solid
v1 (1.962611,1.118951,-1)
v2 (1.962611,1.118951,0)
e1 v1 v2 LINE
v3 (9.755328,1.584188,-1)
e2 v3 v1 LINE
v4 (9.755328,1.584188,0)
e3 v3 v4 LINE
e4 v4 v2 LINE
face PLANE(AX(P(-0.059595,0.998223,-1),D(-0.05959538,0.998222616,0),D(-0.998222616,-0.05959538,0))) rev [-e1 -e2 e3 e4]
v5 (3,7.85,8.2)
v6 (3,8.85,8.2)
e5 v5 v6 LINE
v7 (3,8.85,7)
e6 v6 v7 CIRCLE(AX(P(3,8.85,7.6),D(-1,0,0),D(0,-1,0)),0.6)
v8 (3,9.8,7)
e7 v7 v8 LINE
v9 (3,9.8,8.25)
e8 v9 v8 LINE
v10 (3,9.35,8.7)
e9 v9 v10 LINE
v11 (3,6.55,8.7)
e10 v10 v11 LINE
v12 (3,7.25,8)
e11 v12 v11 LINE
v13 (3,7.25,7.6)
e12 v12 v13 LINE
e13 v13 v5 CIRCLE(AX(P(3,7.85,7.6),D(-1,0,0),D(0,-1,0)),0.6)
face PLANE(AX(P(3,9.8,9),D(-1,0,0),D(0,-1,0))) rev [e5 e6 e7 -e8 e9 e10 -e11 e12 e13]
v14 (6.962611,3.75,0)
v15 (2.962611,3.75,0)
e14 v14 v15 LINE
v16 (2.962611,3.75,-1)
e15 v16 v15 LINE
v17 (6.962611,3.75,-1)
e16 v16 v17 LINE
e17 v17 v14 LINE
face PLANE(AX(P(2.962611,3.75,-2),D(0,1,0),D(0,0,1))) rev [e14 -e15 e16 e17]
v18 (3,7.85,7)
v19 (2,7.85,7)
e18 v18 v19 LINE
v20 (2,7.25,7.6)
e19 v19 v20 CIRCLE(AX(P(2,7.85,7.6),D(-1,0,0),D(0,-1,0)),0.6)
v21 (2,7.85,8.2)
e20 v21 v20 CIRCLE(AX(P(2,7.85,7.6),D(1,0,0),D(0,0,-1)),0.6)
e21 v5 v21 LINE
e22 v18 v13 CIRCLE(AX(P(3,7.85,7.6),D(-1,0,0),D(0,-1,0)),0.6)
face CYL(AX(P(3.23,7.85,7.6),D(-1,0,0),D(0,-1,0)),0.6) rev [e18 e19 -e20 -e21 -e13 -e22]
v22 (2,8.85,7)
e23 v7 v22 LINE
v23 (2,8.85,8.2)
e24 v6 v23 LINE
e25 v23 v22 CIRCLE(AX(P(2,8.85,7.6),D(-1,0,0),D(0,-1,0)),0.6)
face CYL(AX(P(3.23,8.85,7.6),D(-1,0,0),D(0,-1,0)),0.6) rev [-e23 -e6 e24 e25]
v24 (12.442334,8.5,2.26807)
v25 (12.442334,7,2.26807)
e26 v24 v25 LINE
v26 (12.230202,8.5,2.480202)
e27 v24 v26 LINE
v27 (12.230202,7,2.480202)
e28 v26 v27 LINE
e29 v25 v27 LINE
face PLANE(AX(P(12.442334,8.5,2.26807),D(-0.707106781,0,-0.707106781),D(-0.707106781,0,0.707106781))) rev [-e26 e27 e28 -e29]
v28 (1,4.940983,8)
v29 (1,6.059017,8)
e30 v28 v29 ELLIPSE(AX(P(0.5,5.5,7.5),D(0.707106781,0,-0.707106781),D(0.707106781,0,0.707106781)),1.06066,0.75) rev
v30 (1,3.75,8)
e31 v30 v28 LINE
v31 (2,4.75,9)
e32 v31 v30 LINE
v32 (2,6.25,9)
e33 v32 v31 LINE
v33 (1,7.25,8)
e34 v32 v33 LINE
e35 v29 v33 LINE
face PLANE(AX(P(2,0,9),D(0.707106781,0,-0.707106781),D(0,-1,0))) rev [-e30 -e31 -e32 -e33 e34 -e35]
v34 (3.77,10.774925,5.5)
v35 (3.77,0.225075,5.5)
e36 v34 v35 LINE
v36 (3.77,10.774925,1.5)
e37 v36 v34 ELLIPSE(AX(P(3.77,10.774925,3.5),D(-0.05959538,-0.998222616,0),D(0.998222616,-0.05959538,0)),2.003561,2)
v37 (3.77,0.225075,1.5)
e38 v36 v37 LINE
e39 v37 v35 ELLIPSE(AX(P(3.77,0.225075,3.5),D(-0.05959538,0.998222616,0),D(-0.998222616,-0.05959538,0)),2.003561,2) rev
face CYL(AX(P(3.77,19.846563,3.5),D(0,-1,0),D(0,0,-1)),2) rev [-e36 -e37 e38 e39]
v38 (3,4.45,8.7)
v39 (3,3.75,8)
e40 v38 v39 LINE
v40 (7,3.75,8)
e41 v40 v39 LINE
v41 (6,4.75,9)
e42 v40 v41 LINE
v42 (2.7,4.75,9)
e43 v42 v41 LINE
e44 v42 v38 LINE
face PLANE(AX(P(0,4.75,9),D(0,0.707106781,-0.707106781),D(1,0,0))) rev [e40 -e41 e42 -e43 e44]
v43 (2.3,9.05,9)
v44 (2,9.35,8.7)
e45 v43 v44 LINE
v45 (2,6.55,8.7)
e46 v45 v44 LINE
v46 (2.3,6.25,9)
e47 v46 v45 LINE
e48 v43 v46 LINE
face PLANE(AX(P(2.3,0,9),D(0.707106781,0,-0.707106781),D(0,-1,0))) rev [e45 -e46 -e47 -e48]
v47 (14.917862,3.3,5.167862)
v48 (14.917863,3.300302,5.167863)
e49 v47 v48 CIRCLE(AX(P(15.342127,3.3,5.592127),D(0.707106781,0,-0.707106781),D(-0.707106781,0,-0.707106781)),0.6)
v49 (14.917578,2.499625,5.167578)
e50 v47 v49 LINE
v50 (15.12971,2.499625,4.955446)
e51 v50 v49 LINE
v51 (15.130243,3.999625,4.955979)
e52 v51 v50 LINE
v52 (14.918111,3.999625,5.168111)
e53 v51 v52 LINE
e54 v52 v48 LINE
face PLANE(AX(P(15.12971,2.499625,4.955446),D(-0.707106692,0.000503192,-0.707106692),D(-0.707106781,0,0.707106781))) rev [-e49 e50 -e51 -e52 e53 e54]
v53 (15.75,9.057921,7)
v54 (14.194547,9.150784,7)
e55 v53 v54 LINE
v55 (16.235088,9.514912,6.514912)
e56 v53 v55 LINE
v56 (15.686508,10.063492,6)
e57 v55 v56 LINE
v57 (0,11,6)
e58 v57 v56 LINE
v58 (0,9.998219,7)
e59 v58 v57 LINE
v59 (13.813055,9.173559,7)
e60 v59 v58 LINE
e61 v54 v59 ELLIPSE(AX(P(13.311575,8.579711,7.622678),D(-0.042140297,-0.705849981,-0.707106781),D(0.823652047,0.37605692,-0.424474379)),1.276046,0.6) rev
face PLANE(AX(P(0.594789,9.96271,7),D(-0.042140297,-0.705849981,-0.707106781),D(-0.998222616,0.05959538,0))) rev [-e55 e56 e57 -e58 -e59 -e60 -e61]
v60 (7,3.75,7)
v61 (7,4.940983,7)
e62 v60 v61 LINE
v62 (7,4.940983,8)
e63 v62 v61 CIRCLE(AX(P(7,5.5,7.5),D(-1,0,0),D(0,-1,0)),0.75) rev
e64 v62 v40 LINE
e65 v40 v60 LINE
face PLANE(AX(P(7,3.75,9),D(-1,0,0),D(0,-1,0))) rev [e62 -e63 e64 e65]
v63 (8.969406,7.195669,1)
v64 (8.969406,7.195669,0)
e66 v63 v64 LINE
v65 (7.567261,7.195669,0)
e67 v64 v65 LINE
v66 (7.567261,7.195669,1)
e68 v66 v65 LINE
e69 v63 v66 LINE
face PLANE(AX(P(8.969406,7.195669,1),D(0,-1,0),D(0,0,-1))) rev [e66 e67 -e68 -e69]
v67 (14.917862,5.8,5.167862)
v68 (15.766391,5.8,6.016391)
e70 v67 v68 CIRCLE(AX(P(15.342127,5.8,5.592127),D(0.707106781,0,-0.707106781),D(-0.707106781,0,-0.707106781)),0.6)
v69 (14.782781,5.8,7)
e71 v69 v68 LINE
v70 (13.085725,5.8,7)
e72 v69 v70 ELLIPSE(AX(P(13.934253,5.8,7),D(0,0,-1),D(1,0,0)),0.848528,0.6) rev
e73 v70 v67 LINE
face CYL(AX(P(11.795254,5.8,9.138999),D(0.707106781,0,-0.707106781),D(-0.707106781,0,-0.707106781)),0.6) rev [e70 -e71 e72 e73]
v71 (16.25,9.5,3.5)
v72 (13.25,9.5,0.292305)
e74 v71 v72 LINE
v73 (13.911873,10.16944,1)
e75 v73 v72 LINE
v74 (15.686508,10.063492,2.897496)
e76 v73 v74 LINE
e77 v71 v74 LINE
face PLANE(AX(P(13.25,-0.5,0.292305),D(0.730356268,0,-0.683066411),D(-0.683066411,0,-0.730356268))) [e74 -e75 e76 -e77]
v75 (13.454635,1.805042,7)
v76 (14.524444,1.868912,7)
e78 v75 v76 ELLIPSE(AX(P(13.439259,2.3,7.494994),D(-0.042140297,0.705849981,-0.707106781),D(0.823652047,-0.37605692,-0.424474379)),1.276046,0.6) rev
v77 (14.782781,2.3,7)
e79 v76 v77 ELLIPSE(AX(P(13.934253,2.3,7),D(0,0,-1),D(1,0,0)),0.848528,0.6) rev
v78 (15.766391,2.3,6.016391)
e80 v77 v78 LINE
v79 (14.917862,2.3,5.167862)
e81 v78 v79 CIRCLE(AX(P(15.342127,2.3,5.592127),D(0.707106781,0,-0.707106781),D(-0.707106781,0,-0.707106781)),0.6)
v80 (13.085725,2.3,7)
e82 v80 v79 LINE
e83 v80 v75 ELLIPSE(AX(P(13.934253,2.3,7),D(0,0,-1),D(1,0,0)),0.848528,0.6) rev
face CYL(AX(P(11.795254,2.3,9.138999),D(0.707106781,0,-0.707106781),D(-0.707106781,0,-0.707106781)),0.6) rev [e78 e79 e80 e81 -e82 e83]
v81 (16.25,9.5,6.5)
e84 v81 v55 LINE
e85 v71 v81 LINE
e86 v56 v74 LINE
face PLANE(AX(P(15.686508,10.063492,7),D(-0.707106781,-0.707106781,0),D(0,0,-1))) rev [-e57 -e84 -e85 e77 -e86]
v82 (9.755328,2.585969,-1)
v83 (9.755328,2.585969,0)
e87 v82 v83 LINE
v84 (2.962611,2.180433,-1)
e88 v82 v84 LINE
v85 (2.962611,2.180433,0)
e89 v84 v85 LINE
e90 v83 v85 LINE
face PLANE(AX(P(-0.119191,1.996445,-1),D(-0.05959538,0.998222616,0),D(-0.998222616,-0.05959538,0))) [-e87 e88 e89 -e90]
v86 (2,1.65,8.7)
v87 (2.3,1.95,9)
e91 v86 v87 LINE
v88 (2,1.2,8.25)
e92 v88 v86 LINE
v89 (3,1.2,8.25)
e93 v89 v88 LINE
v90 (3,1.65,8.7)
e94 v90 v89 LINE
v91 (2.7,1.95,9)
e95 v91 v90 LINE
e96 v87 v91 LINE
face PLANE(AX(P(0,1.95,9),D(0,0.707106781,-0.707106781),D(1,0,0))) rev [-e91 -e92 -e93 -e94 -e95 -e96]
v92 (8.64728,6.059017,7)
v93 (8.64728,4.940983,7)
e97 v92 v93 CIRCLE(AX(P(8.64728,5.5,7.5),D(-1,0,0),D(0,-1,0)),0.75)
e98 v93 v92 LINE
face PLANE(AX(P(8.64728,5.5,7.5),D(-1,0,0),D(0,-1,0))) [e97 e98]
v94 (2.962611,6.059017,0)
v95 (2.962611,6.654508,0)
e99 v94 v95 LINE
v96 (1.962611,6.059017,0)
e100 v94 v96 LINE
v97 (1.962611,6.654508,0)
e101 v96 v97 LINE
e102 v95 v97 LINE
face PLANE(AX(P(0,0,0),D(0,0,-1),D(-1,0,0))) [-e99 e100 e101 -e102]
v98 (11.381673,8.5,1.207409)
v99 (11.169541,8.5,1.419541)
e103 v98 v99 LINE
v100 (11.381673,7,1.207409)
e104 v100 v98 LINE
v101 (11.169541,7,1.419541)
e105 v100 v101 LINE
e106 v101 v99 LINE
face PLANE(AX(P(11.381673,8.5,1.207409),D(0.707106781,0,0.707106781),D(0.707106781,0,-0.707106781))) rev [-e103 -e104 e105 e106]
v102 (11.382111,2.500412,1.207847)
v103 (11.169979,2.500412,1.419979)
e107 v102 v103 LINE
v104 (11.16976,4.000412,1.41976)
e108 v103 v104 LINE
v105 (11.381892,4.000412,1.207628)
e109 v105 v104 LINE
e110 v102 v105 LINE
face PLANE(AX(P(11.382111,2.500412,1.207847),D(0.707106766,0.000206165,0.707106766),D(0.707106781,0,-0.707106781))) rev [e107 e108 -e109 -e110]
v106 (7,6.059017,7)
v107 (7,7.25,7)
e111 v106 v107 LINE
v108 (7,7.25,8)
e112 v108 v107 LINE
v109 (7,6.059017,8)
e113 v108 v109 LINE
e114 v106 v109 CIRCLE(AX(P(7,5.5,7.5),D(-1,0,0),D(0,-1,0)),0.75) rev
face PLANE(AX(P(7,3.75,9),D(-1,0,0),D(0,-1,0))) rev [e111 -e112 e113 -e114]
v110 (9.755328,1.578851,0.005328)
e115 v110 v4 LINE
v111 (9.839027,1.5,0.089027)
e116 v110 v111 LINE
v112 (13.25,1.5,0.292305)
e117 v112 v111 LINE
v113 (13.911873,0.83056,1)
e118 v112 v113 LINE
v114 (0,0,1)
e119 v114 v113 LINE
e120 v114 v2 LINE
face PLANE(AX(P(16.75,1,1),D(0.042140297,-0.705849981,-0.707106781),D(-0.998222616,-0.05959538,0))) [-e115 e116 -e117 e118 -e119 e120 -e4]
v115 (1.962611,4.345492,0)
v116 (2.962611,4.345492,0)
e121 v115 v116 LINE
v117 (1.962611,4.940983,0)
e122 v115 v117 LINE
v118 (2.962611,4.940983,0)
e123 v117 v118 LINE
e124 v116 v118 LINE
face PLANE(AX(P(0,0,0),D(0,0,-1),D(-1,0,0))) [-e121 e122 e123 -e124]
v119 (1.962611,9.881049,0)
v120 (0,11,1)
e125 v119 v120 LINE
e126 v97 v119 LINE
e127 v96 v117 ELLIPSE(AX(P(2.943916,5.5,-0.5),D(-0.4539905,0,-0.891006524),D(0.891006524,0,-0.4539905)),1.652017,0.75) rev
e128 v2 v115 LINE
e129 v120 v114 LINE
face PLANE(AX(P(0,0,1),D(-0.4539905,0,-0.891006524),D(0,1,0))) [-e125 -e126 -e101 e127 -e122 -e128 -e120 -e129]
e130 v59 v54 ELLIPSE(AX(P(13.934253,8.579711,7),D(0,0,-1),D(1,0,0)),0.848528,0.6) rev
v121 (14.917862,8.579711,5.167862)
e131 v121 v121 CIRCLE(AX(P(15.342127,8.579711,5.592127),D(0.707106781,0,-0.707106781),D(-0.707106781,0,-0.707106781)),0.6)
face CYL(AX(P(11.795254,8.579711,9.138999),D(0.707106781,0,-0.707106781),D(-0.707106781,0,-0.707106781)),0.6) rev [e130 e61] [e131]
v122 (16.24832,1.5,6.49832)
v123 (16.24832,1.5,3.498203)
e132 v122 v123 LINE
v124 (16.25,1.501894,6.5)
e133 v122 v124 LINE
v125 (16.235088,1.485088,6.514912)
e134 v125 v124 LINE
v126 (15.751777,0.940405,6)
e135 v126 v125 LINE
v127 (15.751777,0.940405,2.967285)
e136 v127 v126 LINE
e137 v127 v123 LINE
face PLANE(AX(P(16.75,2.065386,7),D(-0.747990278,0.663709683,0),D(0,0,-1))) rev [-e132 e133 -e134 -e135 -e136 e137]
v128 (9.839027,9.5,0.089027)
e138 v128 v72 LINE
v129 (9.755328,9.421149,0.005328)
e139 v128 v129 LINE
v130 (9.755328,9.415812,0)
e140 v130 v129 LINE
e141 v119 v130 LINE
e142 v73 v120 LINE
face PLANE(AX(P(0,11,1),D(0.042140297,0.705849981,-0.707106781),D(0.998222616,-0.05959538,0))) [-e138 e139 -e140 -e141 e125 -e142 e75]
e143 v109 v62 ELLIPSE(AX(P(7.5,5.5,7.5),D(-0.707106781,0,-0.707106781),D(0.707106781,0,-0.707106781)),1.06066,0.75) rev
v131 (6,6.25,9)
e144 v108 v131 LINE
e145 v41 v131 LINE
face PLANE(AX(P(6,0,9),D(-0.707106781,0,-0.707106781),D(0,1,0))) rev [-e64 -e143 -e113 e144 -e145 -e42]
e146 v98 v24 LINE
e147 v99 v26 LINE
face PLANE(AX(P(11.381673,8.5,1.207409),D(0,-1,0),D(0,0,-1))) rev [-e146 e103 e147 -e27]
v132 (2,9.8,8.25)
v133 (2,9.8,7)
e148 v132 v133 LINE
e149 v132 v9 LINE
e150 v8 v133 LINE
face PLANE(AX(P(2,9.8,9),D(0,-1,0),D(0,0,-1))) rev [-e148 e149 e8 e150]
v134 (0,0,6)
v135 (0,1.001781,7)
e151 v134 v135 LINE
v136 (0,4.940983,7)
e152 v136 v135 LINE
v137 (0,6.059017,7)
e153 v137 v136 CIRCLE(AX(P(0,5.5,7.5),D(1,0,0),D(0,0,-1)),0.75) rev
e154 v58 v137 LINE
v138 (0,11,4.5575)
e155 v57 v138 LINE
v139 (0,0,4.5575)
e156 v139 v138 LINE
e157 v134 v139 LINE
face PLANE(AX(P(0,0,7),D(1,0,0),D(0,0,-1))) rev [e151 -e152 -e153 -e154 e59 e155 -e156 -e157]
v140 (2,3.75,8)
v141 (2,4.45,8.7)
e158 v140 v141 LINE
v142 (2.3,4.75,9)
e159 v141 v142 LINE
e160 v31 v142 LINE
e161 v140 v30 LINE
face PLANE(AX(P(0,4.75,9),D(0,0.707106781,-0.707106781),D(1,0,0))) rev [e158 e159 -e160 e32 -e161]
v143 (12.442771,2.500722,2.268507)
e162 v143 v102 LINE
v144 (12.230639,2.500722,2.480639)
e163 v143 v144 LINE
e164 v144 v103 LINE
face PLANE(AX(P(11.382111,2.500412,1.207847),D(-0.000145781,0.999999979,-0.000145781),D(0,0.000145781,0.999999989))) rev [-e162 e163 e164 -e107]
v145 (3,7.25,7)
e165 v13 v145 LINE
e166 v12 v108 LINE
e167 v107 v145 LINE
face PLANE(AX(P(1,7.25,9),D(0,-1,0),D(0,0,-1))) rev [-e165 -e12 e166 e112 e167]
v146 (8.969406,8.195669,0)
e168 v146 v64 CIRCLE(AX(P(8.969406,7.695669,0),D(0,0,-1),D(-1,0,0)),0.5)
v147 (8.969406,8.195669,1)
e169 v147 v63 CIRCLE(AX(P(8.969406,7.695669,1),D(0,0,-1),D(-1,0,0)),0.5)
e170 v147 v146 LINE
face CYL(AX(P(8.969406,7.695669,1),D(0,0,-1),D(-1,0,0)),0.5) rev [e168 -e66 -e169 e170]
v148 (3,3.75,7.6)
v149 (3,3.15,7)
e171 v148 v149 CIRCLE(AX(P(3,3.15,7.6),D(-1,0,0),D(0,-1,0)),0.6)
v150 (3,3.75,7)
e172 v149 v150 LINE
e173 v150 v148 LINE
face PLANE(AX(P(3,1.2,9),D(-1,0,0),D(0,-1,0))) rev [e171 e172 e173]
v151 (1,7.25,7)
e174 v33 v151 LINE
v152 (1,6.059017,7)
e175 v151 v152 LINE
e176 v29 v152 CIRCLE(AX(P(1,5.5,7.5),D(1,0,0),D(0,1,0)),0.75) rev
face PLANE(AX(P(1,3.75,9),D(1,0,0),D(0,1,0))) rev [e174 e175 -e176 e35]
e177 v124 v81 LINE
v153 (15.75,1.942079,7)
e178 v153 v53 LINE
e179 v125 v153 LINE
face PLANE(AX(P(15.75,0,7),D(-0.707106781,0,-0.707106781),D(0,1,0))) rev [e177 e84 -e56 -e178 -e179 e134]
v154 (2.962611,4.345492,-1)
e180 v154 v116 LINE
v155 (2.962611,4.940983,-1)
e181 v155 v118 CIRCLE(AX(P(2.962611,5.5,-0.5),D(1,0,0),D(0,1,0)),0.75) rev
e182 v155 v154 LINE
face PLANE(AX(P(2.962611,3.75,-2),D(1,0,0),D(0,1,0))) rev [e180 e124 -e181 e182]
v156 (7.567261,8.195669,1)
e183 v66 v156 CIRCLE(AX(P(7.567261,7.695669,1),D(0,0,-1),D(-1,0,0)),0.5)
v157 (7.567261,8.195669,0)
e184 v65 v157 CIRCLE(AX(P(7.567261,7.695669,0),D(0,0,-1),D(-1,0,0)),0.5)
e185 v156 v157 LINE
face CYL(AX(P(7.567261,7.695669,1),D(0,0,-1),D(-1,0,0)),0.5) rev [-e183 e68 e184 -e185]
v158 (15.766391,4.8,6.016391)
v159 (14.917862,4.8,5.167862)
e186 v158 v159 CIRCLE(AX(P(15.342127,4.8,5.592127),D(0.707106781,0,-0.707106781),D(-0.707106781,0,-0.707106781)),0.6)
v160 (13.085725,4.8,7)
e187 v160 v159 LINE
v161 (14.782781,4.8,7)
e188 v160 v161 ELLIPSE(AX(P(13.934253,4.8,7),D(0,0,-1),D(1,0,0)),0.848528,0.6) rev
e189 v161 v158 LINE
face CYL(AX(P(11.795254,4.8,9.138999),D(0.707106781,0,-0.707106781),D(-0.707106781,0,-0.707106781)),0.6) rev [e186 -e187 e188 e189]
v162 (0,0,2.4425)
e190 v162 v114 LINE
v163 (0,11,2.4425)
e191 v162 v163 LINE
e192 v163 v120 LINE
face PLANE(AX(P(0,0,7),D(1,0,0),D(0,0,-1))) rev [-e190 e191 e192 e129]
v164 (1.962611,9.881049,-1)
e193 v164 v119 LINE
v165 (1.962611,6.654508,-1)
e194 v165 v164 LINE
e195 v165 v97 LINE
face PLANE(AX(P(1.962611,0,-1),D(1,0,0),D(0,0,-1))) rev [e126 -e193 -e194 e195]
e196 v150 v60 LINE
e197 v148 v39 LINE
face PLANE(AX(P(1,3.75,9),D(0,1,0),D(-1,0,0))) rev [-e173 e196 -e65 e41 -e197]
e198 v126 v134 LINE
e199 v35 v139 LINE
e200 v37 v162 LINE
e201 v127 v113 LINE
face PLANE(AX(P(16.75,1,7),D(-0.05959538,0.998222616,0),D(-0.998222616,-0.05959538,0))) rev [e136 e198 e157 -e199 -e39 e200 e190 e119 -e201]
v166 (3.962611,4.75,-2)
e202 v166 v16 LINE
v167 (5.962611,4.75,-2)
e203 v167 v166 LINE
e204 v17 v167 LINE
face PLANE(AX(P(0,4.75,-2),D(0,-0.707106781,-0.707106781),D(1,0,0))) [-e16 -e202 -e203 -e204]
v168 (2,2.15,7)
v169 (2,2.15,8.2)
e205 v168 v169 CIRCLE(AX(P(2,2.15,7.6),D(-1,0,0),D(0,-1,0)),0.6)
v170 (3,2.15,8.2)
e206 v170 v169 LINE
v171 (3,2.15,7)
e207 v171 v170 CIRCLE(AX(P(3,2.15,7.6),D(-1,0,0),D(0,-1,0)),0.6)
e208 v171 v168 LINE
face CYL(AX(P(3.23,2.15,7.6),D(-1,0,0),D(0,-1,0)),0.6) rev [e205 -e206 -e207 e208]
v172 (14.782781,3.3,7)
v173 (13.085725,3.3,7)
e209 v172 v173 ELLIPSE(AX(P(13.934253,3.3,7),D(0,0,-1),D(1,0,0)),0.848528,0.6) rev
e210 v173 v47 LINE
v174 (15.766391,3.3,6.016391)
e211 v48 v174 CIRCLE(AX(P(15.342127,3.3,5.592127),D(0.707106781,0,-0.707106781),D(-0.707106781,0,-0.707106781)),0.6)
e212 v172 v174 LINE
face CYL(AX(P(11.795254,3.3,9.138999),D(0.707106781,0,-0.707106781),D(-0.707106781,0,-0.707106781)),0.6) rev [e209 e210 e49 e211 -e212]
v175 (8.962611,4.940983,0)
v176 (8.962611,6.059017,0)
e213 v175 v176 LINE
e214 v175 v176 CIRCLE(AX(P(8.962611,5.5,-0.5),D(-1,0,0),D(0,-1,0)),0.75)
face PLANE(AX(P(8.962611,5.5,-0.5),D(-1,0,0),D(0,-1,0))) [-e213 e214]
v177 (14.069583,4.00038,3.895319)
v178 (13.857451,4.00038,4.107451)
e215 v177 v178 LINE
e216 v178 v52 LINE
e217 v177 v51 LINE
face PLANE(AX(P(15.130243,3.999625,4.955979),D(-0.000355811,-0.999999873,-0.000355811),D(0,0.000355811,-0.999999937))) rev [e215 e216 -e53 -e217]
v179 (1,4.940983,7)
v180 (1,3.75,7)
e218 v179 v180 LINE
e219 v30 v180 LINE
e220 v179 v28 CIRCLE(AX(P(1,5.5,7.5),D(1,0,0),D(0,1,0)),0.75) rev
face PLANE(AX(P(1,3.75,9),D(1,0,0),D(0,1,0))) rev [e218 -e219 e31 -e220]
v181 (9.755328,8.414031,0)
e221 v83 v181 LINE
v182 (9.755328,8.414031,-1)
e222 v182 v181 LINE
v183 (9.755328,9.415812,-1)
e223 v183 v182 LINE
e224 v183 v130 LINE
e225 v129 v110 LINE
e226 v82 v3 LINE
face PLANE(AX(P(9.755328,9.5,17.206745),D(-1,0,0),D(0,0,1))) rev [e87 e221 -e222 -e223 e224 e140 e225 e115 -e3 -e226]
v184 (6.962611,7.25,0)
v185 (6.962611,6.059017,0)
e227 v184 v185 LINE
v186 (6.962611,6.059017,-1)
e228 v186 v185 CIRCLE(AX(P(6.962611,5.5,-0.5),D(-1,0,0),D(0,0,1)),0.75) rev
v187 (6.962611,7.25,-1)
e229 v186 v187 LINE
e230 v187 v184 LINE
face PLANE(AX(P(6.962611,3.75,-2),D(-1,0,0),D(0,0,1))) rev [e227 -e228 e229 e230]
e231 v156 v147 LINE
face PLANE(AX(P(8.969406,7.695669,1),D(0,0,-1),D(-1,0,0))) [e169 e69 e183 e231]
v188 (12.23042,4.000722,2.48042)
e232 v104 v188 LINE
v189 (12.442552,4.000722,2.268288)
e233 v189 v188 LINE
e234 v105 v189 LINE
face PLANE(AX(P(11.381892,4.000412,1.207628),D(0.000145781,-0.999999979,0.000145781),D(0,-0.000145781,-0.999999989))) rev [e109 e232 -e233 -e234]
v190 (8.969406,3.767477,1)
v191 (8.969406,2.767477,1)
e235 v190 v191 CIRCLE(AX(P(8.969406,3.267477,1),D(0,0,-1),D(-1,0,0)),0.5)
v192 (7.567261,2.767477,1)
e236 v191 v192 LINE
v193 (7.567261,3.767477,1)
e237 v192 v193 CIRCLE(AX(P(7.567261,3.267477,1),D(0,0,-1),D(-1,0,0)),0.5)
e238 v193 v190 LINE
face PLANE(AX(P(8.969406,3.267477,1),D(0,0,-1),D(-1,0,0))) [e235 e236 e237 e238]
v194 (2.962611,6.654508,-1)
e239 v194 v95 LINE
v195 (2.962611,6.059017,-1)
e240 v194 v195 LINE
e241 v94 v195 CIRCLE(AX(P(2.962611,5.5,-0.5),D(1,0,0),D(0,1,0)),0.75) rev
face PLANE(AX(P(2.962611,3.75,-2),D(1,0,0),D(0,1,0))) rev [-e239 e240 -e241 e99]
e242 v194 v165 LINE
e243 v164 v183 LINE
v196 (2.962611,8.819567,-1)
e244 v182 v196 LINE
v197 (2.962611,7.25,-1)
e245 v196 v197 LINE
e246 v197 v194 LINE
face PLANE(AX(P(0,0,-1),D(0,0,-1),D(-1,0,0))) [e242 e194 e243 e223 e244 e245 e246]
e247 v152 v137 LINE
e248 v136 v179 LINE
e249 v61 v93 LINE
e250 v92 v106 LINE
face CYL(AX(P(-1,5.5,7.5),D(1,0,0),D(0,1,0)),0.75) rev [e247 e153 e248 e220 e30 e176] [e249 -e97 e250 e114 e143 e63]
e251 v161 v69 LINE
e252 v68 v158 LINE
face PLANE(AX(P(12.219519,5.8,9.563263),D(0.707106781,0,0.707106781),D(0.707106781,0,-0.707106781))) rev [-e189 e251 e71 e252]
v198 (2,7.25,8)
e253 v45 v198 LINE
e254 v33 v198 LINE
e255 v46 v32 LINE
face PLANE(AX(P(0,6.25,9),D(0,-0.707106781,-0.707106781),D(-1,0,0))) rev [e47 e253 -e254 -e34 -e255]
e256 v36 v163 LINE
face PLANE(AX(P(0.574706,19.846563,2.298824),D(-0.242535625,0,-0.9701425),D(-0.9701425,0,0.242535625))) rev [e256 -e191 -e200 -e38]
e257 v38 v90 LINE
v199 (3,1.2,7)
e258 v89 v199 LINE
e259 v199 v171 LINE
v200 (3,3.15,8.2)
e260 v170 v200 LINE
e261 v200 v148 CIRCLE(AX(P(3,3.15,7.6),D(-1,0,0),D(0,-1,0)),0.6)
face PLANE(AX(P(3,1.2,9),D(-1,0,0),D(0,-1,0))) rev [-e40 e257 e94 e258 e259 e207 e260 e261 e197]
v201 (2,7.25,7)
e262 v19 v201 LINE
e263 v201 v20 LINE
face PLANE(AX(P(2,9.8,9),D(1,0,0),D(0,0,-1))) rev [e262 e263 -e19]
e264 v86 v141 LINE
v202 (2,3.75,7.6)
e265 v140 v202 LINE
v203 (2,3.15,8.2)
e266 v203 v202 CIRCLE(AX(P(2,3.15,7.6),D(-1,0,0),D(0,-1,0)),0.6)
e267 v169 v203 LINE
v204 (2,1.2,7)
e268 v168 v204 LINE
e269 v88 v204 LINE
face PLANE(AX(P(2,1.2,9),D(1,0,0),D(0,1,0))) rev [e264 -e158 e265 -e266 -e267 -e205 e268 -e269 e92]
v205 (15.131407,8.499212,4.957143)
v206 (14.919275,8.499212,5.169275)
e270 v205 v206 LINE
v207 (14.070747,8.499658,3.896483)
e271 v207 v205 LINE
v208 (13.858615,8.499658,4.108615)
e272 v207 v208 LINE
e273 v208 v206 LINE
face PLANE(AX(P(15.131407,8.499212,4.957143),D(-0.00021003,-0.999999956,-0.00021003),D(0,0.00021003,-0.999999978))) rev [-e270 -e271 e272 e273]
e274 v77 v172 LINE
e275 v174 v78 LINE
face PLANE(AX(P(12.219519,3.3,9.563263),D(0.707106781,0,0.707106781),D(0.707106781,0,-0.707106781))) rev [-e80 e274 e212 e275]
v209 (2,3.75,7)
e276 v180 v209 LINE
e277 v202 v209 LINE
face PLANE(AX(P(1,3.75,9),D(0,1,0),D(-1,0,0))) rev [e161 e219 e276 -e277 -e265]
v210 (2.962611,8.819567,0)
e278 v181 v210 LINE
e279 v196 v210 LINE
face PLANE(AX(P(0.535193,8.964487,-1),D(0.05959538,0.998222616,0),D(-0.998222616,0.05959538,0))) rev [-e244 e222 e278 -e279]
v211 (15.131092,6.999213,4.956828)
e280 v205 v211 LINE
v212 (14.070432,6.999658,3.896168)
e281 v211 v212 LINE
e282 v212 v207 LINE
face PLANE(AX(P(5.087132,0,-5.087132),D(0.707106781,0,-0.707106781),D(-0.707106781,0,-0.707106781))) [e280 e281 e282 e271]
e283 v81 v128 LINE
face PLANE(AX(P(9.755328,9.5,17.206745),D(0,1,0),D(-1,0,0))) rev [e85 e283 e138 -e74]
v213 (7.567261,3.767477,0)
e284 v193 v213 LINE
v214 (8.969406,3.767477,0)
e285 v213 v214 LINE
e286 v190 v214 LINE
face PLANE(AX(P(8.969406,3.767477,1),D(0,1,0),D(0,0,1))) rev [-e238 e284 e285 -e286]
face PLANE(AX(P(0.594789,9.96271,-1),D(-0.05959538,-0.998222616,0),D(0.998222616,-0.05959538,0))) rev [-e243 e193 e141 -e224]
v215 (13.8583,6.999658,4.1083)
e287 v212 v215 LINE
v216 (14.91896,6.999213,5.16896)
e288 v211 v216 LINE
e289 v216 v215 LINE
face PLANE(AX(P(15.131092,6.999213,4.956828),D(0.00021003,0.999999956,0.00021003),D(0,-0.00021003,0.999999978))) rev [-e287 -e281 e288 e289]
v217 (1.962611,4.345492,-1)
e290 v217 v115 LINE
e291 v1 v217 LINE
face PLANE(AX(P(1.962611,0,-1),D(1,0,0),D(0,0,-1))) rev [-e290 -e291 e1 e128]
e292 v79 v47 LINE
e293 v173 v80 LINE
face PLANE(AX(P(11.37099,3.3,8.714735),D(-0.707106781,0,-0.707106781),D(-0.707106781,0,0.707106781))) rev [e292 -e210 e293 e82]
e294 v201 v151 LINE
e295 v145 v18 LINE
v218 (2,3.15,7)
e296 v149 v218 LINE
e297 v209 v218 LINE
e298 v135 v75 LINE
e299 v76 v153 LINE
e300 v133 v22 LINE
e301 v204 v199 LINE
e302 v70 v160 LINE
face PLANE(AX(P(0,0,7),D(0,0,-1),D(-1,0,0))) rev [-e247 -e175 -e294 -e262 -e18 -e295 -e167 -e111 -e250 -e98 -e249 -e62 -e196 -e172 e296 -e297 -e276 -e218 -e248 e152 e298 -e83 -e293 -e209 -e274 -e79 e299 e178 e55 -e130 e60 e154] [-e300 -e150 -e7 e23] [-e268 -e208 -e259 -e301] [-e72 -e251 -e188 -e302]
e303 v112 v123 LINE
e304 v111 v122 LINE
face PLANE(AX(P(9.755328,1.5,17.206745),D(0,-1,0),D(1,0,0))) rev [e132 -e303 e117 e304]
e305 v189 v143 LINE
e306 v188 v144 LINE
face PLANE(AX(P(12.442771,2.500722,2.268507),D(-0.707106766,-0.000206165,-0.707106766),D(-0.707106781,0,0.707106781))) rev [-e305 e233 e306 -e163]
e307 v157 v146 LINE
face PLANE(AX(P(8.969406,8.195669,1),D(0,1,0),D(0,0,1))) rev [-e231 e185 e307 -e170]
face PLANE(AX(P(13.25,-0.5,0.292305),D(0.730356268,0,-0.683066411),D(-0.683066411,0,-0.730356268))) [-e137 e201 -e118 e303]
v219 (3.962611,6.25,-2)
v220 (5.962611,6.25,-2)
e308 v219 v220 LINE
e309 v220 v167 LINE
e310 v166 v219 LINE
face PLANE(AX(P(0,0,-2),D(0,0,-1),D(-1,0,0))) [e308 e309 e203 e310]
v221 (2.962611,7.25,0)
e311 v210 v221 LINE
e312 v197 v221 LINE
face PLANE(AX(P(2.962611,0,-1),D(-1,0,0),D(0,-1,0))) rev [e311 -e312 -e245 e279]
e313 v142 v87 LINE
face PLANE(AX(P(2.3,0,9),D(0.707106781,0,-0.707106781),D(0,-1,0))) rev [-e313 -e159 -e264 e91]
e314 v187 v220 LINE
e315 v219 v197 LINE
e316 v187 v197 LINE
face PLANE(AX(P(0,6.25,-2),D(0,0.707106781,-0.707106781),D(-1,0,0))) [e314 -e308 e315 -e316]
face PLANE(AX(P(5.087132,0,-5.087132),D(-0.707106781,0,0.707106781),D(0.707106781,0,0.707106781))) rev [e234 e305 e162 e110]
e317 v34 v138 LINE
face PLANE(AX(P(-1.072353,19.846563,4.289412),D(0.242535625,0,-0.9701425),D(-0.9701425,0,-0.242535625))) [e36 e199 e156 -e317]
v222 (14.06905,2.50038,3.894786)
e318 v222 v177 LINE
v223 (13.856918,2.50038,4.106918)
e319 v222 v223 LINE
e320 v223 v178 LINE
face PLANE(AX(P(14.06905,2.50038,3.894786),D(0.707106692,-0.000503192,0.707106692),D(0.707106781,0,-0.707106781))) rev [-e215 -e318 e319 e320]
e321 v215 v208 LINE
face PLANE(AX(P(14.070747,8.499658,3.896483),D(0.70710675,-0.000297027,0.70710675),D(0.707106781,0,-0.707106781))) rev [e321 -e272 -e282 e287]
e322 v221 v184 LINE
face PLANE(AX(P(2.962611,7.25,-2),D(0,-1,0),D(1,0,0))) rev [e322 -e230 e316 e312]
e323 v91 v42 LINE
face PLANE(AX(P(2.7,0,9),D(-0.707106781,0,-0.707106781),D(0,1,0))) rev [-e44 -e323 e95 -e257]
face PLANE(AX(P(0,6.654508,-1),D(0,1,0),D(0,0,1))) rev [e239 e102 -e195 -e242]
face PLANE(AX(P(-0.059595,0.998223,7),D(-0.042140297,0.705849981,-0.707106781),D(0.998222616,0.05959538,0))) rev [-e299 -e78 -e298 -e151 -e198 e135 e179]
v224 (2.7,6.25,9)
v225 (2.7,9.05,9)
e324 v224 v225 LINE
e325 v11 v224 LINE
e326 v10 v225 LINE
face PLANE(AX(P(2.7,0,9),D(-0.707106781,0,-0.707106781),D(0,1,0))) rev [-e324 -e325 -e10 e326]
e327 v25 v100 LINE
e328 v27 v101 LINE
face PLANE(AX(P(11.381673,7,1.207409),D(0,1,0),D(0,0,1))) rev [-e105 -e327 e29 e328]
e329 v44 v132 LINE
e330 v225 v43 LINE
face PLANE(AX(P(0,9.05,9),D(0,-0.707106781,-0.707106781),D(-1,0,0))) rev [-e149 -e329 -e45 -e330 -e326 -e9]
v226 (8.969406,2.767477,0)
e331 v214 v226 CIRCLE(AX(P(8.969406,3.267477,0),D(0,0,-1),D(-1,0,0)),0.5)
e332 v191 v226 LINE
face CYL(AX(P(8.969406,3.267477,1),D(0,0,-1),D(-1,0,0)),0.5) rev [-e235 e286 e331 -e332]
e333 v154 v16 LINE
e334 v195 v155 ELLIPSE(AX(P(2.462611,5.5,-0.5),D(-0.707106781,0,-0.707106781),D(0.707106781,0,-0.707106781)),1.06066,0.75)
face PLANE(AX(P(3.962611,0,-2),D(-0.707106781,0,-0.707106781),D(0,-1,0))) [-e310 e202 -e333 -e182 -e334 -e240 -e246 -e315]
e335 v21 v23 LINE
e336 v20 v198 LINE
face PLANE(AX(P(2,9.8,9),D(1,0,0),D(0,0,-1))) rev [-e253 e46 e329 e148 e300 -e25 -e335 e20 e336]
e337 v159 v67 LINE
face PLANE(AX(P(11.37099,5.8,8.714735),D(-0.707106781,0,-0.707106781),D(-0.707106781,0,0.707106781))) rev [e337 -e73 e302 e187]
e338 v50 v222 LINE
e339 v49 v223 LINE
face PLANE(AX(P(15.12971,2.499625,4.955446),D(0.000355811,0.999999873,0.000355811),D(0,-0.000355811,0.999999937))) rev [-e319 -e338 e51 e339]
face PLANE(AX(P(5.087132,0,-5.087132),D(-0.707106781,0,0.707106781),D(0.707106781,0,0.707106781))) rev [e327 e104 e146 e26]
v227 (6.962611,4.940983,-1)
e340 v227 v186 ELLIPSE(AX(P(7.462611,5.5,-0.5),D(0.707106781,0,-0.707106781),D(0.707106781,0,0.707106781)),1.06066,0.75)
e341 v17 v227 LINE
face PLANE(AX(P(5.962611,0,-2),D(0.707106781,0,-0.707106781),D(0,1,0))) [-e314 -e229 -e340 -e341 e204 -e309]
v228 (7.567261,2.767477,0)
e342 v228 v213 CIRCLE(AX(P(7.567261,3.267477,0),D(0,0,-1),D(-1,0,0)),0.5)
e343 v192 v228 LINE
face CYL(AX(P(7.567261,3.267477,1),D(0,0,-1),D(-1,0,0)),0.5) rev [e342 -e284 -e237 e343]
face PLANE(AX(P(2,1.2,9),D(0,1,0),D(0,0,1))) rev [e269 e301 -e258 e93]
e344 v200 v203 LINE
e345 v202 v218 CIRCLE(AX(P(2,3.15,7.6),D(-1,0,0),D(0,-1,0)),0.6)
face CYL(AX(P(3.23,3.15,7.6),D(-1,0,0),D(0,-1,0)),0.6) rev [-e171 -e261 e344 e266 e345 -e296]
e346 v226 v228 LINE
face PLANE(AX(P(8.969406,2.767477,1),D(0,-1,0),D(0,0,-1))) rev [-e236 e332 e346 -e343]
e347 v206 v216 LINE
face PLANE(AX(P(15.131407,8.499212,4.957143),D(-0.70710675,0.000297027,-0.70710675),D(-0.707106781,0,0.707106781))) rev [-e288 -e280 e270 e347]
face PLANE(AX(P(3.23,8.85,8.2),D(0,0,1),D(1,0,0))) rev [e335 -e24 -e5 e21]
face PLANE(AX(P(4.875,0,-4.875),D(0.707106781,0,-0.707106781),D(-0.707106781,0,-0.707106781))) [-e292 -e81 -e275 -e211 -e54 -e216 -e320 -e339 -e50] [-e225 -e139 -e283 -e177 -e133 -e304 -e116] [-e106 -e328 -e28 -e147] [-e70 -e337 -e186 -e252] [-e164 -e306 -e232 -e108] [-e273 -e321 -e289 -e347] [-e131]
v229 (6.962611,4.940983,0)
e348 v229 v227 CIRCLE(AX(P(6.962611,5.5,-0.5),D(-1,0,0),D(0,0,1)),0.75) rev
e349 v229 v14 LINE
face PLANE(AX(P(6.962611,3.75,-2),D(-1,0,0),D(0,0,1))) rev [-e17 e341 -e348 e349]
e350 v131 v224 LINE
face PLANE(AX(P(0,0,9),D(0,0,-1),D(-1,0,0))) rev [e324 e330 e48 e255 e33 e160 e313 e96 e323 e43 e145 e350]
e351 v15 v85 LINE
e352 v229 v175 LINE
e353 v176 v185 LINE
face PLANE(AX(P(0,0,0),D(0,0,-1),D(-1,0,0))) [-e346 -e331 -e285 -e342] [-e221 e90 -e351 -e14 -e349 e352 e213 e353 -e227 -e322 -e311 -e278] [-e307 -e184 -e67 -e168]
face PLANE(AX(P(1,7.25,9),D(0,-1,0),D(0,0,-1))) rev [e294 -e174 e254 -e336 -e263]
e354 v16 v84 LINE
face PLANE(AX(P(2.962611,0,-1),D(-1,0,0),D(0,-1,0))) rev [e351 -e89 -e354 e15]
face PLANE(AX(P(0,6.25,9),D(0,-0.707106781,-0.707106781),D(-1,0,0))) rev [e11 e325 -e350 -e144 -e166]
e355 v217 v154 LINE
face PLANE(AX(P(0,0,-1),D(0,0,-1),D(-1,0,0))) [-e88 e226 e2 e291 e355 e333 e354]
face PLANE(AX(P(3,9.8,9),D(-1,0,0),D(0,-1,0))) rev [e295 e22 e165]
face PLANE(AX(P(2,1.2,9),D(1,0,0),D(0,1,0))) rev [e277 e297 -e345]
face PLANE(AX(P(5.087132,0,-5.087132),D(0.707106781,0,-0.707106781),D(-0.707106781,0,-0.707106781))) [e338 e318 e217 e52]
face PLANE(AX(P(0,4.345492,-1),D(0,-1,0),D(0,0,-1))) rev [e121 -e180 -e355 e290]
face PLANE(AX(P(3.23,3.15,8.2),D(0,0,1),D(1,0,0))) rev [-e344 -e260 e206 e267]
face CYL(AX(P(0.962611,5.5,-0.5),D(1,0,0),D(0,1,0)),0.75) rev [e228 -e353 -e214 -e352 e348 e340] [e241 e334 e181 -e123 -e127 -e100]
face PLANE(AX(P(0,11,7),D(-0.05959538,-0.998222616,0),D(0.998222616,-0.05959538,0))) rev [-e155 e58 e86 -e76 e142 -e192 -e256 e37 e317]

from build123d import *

# Parameters (mm, degrees)
BOSS_EXTRUDE1_DEPTH      = 7
CHAMFER1_SIZE            = 1
CHAMFER7_SIZE            = 1
CHAMFER7_EDGE_2_SIZE     = 1
CHAMFER7_EDGE_2_SIZE2    = 1.065385663
CHAMFER7_EDGE_3_SIZE     = 1
CHAMFER7_EDGE_4_SIZE     = 1
CHAMFER7_EDGE_4_SIZE2    = 1.065385663
CHAMFER14_SIZE           = 1
CHAMFER14_SIZE2          = 1.962610506
SKETCH13_W               = 6
SKETCH13_H               = 3.5
BOSS_EXTRUDE4_DEPTH      = 2
CUT_EXTRUDE9_DEPTH       = 2
CUT_EXTRUDE9_DEPTH_BACK  = 7.647280269
SKETCH14_R               = 0.75
CHAMFER15_SIZE           = 1
SKETCH15_W               = 4
SKETCH15_H               = 3.5
BOSS_EXTRUDE6_DEPTH      = 2
CUT_EXTRUDE10_DEPTH      = 2
CUT_EXTRUDE10_DEPTH_BACK = 6
SKETCH18_R               = 0.75
CHAMFER16_SIZE           = 1
CUT_EXTRUDE12_REACH      = 23.967
SKETCH19_W               = 7.661214419
SKETCH19_H               = 8
CUT_EXTRUDE14_DEPTH      = 10
CUT_EXTRUDE14_DEPTH_BACK = 2
SKETCH23_W               = 1.5
SKETCH23_H               = 1.5
BOSS_EXTRUDE7_DEPTH      = 0.3
SKETCH30_W               = 1
SKETCH30_H               = 3.55
BOSS_EXTRUDE12_DEPTH     = 2
CHAMFER19_SIZE           = 0.3
CHAMFER20_SIZE           = 0.75
CUT_EXTRUDE32_DEPTH      = 1.23
CUT_EXTRUDE33_REACH      = 23.588
CUT_EXTRUDE34_REACH      = 23.045
SKETCH38_R               = 0.6
BOSS_EXTRUDE13_DEPTH     = 1
CUT_EXTRUDE35_DEPTH      = 1


with BuildPart() as part:
    # Sketch2 → Boss-Extrude1 (new body)
    with BuildSketch(Plane.XY):
        Polygon((0, 0), (0, 11), (16.75, 10), (16.75, 1), align=None)
    extrude(amount=BOSS_EXTRUDE1_DEPTH)

    # Chamfer1
    chamfer1_edges = [part.edges().sort_by_distance(p)[0] for p in [
        (8.375, 10.5, 7),
        (8.375, 0.5, 7),
        (8.375, 10.5, 0),
        (8.375, 0.5, 0),
    ]]
    chamfer(chamfer1_edges, length=CHAMFER1_SIZE)

    # Chamfer7
    chamfer7_edges = [part.edges().sort_by_distance(p)[0] for p in [
        (16.75, 5.5, 7),
    ]]
    chamfer(chamfer7_edges, length=CHAMFER7_SIZE)

    # Chamfer7 edge 2
    chamfer7_edge_2_edges = [part.edges().sort_by_distance(p)[0] for p in [
        (16.75, 1, 3.5),
    ]]
    chamfer7_edge_2_side = [part.faces().sort_by_distance(p)[0] for p in [
        (8.375, 0.5, 3.5),
    ]]
    chamfer(chamfer7_edge_2_edges, length=CHAMFER7_EDGE_2_SIZE, length2=CHAMFER7_EDGE_2_SIZE2, reference=chamfer7_edge_2_side[0])

    # Chamfer7 edge 3
    chamfer7_edge_3_edges = [part.edges().sort_by_distance(p)[0] for p in [
        (16.75, 5.5, 0),
    ]]
    chamfer(chamfer7_edge_3_edges, length=CHAMFER7_EDGE_3_SIZE)

    # Chamfer7 edge 4
    chamfer7_edge_4_edges = [part.edges().sort_by_distance(p)[0] for p in [
        (16.75, 10, 3.5),
    ]]
    chamfer7_edge_4_side = [part.faces().sort_by_distance(p)[0] for p in [
        (16.75, 5.5, 3.5),
    ]]
    chamfer(chamfer7_edge_4_edges, length=CHAMFER7_EDGE_4_SIZE, length2=CHAMFER7_EDGE_4_SIZE2, reference=chamfer7_edge_4_side[0])

    # Chamfer14
    chamfer14_edges = [part.edges().sort_by_distance(p)[0] for p in [
        (0, 5.5, 0),
    ]]
    chamfer14_side = [part.faces().sort_by_distance(p)[0] for p in [
        (0, 5.5, 3.5),
    ]]
    chamfer(chamfer14_edges, length=CHAMFER14_SIZE, length2=CHAMFER14_SIZE2, reference=chamfer14_side[0])

    # Sketch13 → Boss-Extrude4 (add)
    with BuildSketch(Plane.XY.offset(7)):
        with Locations((4, 5.5)):
            Rectangle(SKETCH13_W, SKETCH13_H)
    extrude(amount=BOSS_EXTRUDE4_DEPTH)

    # Sketch14 → Cut-Extrude9 (cut, two sides: drawn at the far end of the back side and taken through both)
    with BuildSketch(Plane.ZY.offset(-1).offset(-CUT_EXTRUDE9_DEPTH_BACK)):
        with Locations(Location((7.5, 5.5, 0), (0, 0, 131.810314896))):
            Circle(SKETCH14_R)
    extrude(amount=CUT_EXTRUDE9_DEPTH + CUT_EXTRUDE9_DEPTH_BACK, mode=Mode.SUBTRACT)

    # Chamfer15
    # the kernel refuses this chamfer: 1 mm, written as the material it takes off along each edge
    with BuildSketch(Plane(origin=(7, 1.178317012, 9), x_dir=(0.027495876610586487, 0, -0.9996219169112968), z_dir=(0, 1, 0)), Plane(origin=(1, 9.821682988, 9), x_dir=(-0.02749587661058638, 0, -0.9996219169112968), z_dir=(0, -1, 0))) as chamfer15_piece_1:
        Polygon((CHAMFER15_SIZE * 0.999621916911, CHAMFER15_SIZE * 0.0274958766106), (-CHAMFER15_SIZE * 0.0274958766106, CHAMFER15_SIZE * 0.999621916911), (0, 0), align=None)
    extrude(amount=8.643365976, mode=Mode.SUBTRACT)
    with BuildSketch(Plane(origin=(9.571682988, 7.25, 9), x_dir=(0, 0.027495876610586487, -0.9996219169112968), z_dir=(-1, 0, 0)), Plane(origin=(-1.571682988, 3.75, 9), x_dir=(0, -0.027495876610586487, -0.9996219169112968), z_dir=(1, 0, 0))) as chamfer15_piece_2:
        Polygon((CHAMFER15_SIZE * 0.999621916911, CHAMFER15_SIZE * 0.0274958766106), (-CHAMFER15_SIZE * 0.0274958766106, CHAMFER15_SIZE * 0.999621916911), (0, 0), align=None)
    extrude(amount=11.143365976, mode=Mode.SUBTRACT)

    # Sketch15 → Boss-Extrude6 (add)
    with BuildSketch(Plane(origin=(0, 0, 0), x_dir=(-1, 0, 0), z_dir=(0, 0, -1))):
        with Locations((-4.962610506, 5.5)):
            Rectangle(SKETCH15_W, SKETCH15_H)
    extrude(amount=BOSS_EXTRUDE6_DEPTH)

    # Sketch18 → Cut-Extrude10 (cut, two sides: drawn at the far end of the back side and taken through both)
    with BuildSketch(Plane.ZY.offset(-2.962610506).offset(-CUT_EXTRUDE10_DEPTH_BACK)):
        with Locations(Location((-0.5, 5.5, 0), (0, 0, 48.189685104))):
            Circle(SKETCH18_R)
    extrude(amount=CUT_EXTRUDE10_DEPTH + CUT_EXTRUDE10_DEPTH_BACK, mode=Mode.SUBTRACT)

    # Chamfer16
    # the kernel refuses this chamfer: 1 mm, written as the material it takes off along each edge
    with BuildSketch(Plane(origin=(6.962610506, 1.178317012, -2), x_dir=(0.027495876610586487, 0, 0.9996219169112968), z_dir=(0, 1, 0)), Plane(origin=(2.962610506, 9.821682988, -2), x_dir=(-0.027495876610586487, 0, 0.9996219169112968), z_dir=(0, -1, 0))) as chamfer16_piece_1:
        Polygon((CHAMFER16_SIZE * 0.999621916911, -CHAMFER16_SIZE * 0.0274958766106), (-CHAMFER16_SIZE * 0.0274958766106, -CHAMFER16_SIZE * 0.999621916911), (0, 0), align=None)
    extrude(amount=8.643365976, mode=Mode.SUBTRACT)
    with BuildSketch(Plane(origin=(0.390927518, 3.75, -2), x_dir=(0, -0.027495876610586487, 0.9996219169112968), z_dir=(1, 0, 0)), Plane(origin=(9.534293493, 7.25, -2), x_dir=(0, 0.027495876610586487, 0.9996219169112968), z_dir=(-1, 0, 0))) as chamfer16_piece_2:
        Polygon((CHAMFER16_SIZE * 0.999621916911, -CHAMFER16_SIZE * 0.0274958766106), (-CHAMFER16_SIZE * 0.0274958766106, -CHAMFER16_SIZE * 0.999621916911), (0, 0), align=None)
    extrude(amount=9.143365976, mode=Mode.SUBTRACT)

    # Cut-Extrude12: up to this plane
    cut_extrude12_end = Plane(origin=(4.875, 0, -4.875), z_dir=(0.7071067811865475, 0, -0.7071067811865477))
    # Sketch19 → Cut-Extrude12 (cut, up to the surface)
    with BuildSketch(Plane(origin=(0, 0, 0), x_dir=(-1, 0, 0), z_dir=(0, 0, -1)), mode=Mode.PRIVATE) as cut_extrude12_sk1:
        with Locations((-13.585935075, 5.5)):
            Rectangle(SKETCH19_W, SKETCH19_H)
    cut_extrude12_tool1 = split(extrude(cut_extrude12_sk1.sketch, amount=-CUT_EXTRUDE12_REACH, mode=Mode.PRIVATE), bisect_by=cut_extrude12_end, keep=Keep.BOTH, mode=Mode.PRIVATE)
    add(cut_extrude12_tool1.solids().sort_by_distance((13.585935, 5.5, 0))[0], mode=Mode.SUBTRACT)

    # Sketch21 → Cut-Extrude14 (cut, two sides: drawn at the far end of the back side and taken through both)
    with BuildSketch(Plane.XZ.offset(-9.5).offset(-CUT_EXTRUDE14_DEPTH_BACK)):
        Polygon((16.25, 3.5), (16.25, 0.5), (16.25, -4.059078881), (11.307076373, -4.059078881), (13.25, 0.292304862), align=None)
    extrude(amount=CUT_EXTRUDE14_DEPTH + CUT_EXTRUDE14_DEPTH_BACK, mode=Mode.SUBTRACT)

    # Sketch23 → Boss-Extrude7 (add)
    with BuildSketch(Plane(origin=(4.875, 0, -4.875), x_dir=(-0.7071067811865476, 0, -0.7071067811865476), z_dir=(0.7071067811865476, 0, -0.7071067811865476))):
        Polygon((-10.402444277, 2.500721643), (-10.402135029, 4.000721611), (-8.902135061, 4.000412363), (-8.902444309, 2.500412395), align=None)
        with Locations((-9.651825855, 7.75)):
            Rectangle(SKETCH23_W, SKETCH23_H)
        Polygon((-12.702349723, 2.500380076), (-12.703104511, 4.000379886), (-14.203104321, 3.999625098), (-14.202349533, 2.499625288), align=None)
        Polygon((-14.204750024, 8.499212445), (-12.70475009, 8.499657985), (-12.70430455, 6.999658051), (-14.204304484, 6.999212511), align=None)
    extrude(amount=BOSS_EXTRUDE7_DEPTH)

    # Sketch30 → Boss-Extrude12 (add)
    with BuildSketch(Plane.XY.offset(7)):
        with Locations((2.5, 8.025)):
            Rectangle(SKETCH30_W, SKETCH30_H)
        with Locations((2.5, 2.975)):
            Rectangle(SKETCH30_W, SKETCH30_H)
    extrude(amount=BOSS_EXTRUDE12_DEPTH)

    # Chamfer19
    # the kernel refuses this chamfer: 0.3 mm, written as the material it takes off along each edge
    with BuildSketch(Plane(origin=(2, 6.25, 9), x_dir=(-0.027495876610586622, 0, -0.9996219169112968), z_dir=(0, 1, 0))) as chamfer19_piece_1_section:
        Polygon((CHAMFER19_SIZE * 0.999621916911, -CHAMFER19_SIZE * 0.0274958766106), (-CHAMFER19_SIZE * 0.0274958766106, -CHAMFER19_SIZE * 0.999621916911), (0, 0), align=None)
    chamfer19_piece_1 = extrude(amount=4.321504896, mode=Mode.PRIVATE)
    chamfer19_piece_1 = split(chamfer19_piece_1, bisect_by=Plane(origin=(2.100724638, 7.211413043, 8.038586957), z_dir=(0, 0.7071067811862649, 0.7071067811868302)), keep=Keep.TOP, mode=Mode.PRIVATE)
    add(chamfer19_piece_1, mode=Mode.SUBTRACT)
    with BuildSketch(Plane(origin=(3, 10.571504896, 9), x_dir=(0.027495876610585904, 0, -0.9996219169112968), z_dir=(0, -1, 0))) as chamfer19_piece_2_section:
        Polygon((CHAMFER19_SIZE * 0.999621916911, -CHAMFER19_SIZE * 0.0274958766106), (-CHAMFER19_SIZE * 0.0274958766106, -CHAMFER19_SIZE * 0.999621916911), (0, 0), align=None)
    chamfer19_piece_2 = extrude(amount=5.093009793, mode=Mode.PRIVATE)
    chamfer19_piece_2 = split(chamfer19_piece_2, bisect_by=Plane(origin=(2.899275362, 7.211413043, 8.038586957), z_dir=(0, 0.7071067811862649, 0.7071067811868302)), keep=Keep.TOP, mode=Mode.PRIVATE)
    add(chamfer19_piece_2, mode=Mode.SUBTRACT)
    with BuildSketch(Plane(origin=(2, 0.428495104, 9), x_dir=(-0.027495876610586622, 0, -0.9996219169112968), z_dir=(0, 1, 0))) as chamfer19_piece_3_section:
        Polygon((CHAMFER19_SIZE * 0.999621916911, -CHAMFER19_SIZE * 0.0274958766106), (-CHAMFER19_SIZE * 0.0274958766106, -CHAMFER19_SIZE * 0.999621916911), (0, 0), align=None)
    chamfer19_piece_3 = extrude(amount=4.321504896, mode=Mode.PRIVATE)
    chamfer19_piece_3 = split(chamfer19_piece_3, bisect_by=Plane(origin=(2.100724638, 3.788586957, 8.038586957), z_dir=(0, -0.7071067811862649, 0.7071067811868302)), keep=Keep.TOP, mode=Mode.PRIVATE)
    add(chamfer19_piece_3, mode=Mode.SUBTRACT)
    with BuildSketch(Plane(origin=(3, 5.521504896, 9), x_dir=(0.027495876610585904, 0, -0.9996219169112968), z_dir=(0, -1, 0))) as chamfer19_piece_4_section:
        Polygon((CHAMFER19_SIZE * 0.999621916911, -CHAMFER19_SIZE * 0.0274958766106), (-CHAMFER19_SIZE * 0.0274958766106, -CHAMFER19_SIZE * 0.999621916911), (0, 0), align=None)
    chamfer19_piece_4 = extrude(amount=5.093009793, mode=Mode.PRIVATE)
    chamfer19_piece_4 = split(chamfer19_piece_4, bisect_by=Plane(origin=(2.899275362, 3.788586957, 8.038586957), z_dir=(0, -0.7071067811862649, 0.7071067811868302)), keep=Keep.TOP, mode=Mode.PRIVATE)
    add(chamfer19_piece_4, mode=Mode.SUBTRACT)

    # Chamfer20
    chamfer20_edges = [part.edges().sort_by_distance(p)[0] for p in [
        (2.5, 1.2, 9),
        (2.5, 9.8, 9),
    ]]
    chamfer(chamfer20_edges, length=CHAMFER20_SIZE)

    # Sketch35 → Cut-Extrude32 (cut)
    with BuildSketch(Plane.ZY.offset(-2)):
        with BuildLine():
            Line((8.2, 8.85), (8.2, 7.85))
            ThreePointArc((8.2, 7.85), (7.6, 7.25), (7, 7.85))
            Line((7, 7.85), (7, 8.85))
            ThreePointArc((7, 8.85), (7.6, 9.45), (8.2, 8.85))
        make_face()
        with BuildLine():
            Line((8.2, 3.15), (8.2, 2.15))
            ThreePointArc((8.2, 2.15), (7.6, 1.55), (7, 2.15))
            Line((7, 2.15), (7, 3.15))
            ThreePointArc((7, 3.15), (7.6, 3.75), (8.2, 3.15))
        make_face()
    extrude(amount=-CUT_EXTRUDE32_DEPTH, mode=Mode.SUBTRACT)

    # Cut-Extrude33: up to this plane
    cut_extrude33_end = Plane(origin=(0, 11, 7), z_dir=(-0.059595380047235344, -0.9982226157912, 0))
    # Sketch36 → Cut-Extrude33 (cut, up to the surface)
    with BuildSketch(Plane(origin=(0, 0, 0), x_dir=(0, 0, -1), z_dir=(0, 1, 0)), mode=Mode.PRIVATE) as cut_extrude33_sk1:
        with BuildLine():
            Line((-1.735294118, -2.828823529), (-3, 2.23))
            Line((-3, 2.23), (-4, 2.23))
            Line((-4, 2.23), (-5.264705882, -2.828823529))
            ThreePointArc((-5.264705882, -2.828823529), (-3.5, -1.77), (-1.735294118, -2.828823529))
        make_face()
    cut_extrude33_tool1 = split(extrude(cut_extrude33_sk1.sketch, amount=CUT_EXTRUDE33_REACH, mode=Mode.PRIVATE), bisect_by=cut_extrude33_end, keep=Keep.BOTH, mode=Mode.PRIVATE)
    add(cut_extrude33_tool1.solids().sort_by_distance((0.278692, 0, 3.5))[0], mode=Mode.SUBTRACT)
    # Sketch36 → Cut-Extrude33 (cut, up to the surface)
    with BuildSketch(Plane(origin=(0, 0, 0), x_dir=(0, 0, -1), z_dir=(0, 1, 0)), mode=Mode.PRIVATE) as cut_extrude33_sk2:
        with BuildLine():
            Line((-1.5, -3.77), (-1.735294118, -2.828823529))
            ThreePointArc((-1.735294118, -2.828823529), (-3.5, -1.77), (-5.264705882, -2.828823529))
            Line((-5.264705882, -2.828823529), (-5.5, -3.77))
            ThreePointArc((-5.5, -3.77), (-3.5, -5.77), (-1.5, -3.77))
        make_face()
    cut_extrude33_tool2 = split(extrude(cut_extrude33_sk2.sketch, amount=CUT_EXTRUDE33_REACH, mode=Mode.PRIVATE), bisect_by=cut_extrude33_end, keep=Keep.BOTH, mode=Mode.PRIVATE)
    add(cut_extrude33_tool2.solids().sort_by_distance((3.772955, 0, 3.5))[0], mode=Mode.SUBTRACT)

    # Cut-Extrude34: up to this plane
    cut_extrude34_end = Plane(origin=(0, 0, 7), z_dir=(0, 0, -1))
    # Sketch38 → Cut-Extrude34 (cut, up to the surface)
    with BuildSketch(Plane(origin=(4.875, 0, -4.875), x_dir=(-0.7071067811865476, 0, -0.7071067811865476), z_dir=(0.7071067811865476, 0, -0.7071067811865476)), mode=Mode.PRIVATE) as cut_extrude34_sk1:
        with Locations((-14.802752351, 8.579711474)):
            Circle(SKETCH38_R)
    cut_extrude34_tool1 = split(extrude(cut_extrude34_sk1.sketch, amount=-CUT_EXTRUDE34_REACH, mode=Mode.PRIVATE), bisect_by=cut_extrude34_end, keep=Keep.BOTH, mode=Mode.PRIVATE)
    add(cut_extrude34_tool1.solids().sort_by_distance((15.342127, 8.579711, 5.592127))[0], mode=Mode.SUBTRACT)
    # Sketch38 → Cut-Extrude34 (cut, up to the surface)
    with BuildSketch(Plane(origin=(4.875, 0, -4.875), x_dir=(-0.7071067811865476, 0, -0.7071067811865476), z_dir=(0.7071067811865476, 0, -0.7071067811865476)), mode=Mode.PRIVATE) as cut_extrude34_sk2:
        with BuildLine():
            Line((-14.202752351, 5.8), (-14.202752351, 4.8))
            ThreePointArc((-14.202752351, 4.8), (-14.802752351, 4.2), (-15.402752351, 4.8))
            Line((-15.402752351, 4.8), (-15.402752351, 5.8))
            ThreePointArc((-15.402752351, 5.8), (-14.802752351, 6.4), (-14.202752351, 5.8))
        make_face()
    cut_extrude34_tool2 = split(extrude(cut_extrude34_sk2.sketch, amount=-CUT_EXTRUDE34_REACH, mode=Mode.PRIVATE), bisect_by=cut_extrude34_end, keep=Keep.BOTH, mode=Mode.PRIVATE)
    add(cut_extrude34_tool2.solids().sort_by_distance((15.342127, 5.3, 5.592127))[0], mode=Mode.SUBTRACT)
    # Sketch38 → Cut-Extrude34 (cut, up to the surface)
    with BuildSketch(Plane(origin=(4.875, 0, -4.875), x_dir=(-0.7071067811865476, 0, -0.7071067811865476), z_dir=(0.7071067811865476, 0, -0.7071067811865476)), mode=Mode.PRIVATE) as cut_extrude34_sk3:
        with BuildLine():
            Line((-14.202752351, 3.3), (-14.202752351, 2.3))
            ThreePointArc((-14.202752351, 2.3), (-14.802752351, 1.7), (-15.402752351, 2.3))
            Line((-15.402752351, 2.3), (-15.402752351, 3.3))
            ThreePointArc((-15.402752351, 3.3), (-14.802752351, 3.9), (-14.202752351, 3.3))
        make_face()
    cut_extrude34_tool3 = split(extrude(cut_extrude34_sk3.sketch, amount=-CUT_EXTRUDE34_REACH, mode=Mode.PRIVATE), bisect_by=cut_extrude34_end, keep=Keep.BOTH, mode=Mode.PRIVATE)
    add(cut_extrude34_tool3.solids().sort_by_distance((15.342127, 2.8, 5.592127))[0], mode=Mode.SUBTRACT)

    # Sketch39 → Boss-Extrude13 (add)
    with BuildSketch(Plane(origin=(0, 0, 0), x_dir=(-1, 0, 0), z_dir=(0, 0, -1))):
        Polygon((-2.962610506, 3.75), (-2.962610506, 2.180433367), (-1.962610506, 2.120731874), (-1.962610506, 4.345491503), (-2.962610506, 4.345491503), align=None)
        Polygon((-2.962610506, 2.180433367), (-9.755327865, 2.585968732), (-9.755327865, 1.584188183), (-1.962610506, 1.118951325), (-1.962610506, 2.120731874), align=None)
        Polygon((-1.962610506, 6.654508497), (-1.962610506, 8.879268126), (-2.962610506, 8.819566633), (-2.962610506, 7.25), (-2.962610506, 6.654508497), align=None)
        Polygon((-1.962610506, 8.879268126), (-1.962610506, 9.881048675), (-9.755327865, 9.415811817), (-9.755327865, 8.414031268), (-2.962610506, 8.819566633), align=None)
    extrude(amount=BOSS_EXTRUDE13_DEPTH)

    # Sketch41 → Cut-Extrude35 (cut)
    with BuildSketch(Plane(origin=(0, 0, 0), x_dir=(-1, 0, 0), z_dir=(0, 0, -1))):
        with BuildLine():
            Line((-8.969406145, 8.195669333), (-7.567261367, 8.195669333))
            ThreePointArc((-7.567261367, 8.195669333), (-7.067261367, 7.695669333), (-7.567261367, 7.195669333))
            Line((-7.567261367, 7.195669333), (-8.969406145, 7.195669333))
            ThreePointArc((-8.969406145, 7.195669333), (-9.469406145, 7.695669333), (-8.969406145, 8.195669333))
        make_face()
        with BuildLine():
            Line((-8.969406145, 3.767476747), (-7.567261367, 3.767476747))
            ThreePointArc((-7.567261367, 3.767476747), (-7.067261367, 3.267476747), (-7.567261367, 2.767476747))
            Line((-7.567261367, 2.767476747), (-8.969406145, 2.767476747))
            ThreePointArc((-8.969406145, 2.767476747), (-9.469406145, 3.267476747), (-8.969406145, 3.767476747))
        make_face()
    extrude(amount=-CUT_EXTRUDE35_DEPTH, mode=Mode.SUBTRACT)


solid = part.part
